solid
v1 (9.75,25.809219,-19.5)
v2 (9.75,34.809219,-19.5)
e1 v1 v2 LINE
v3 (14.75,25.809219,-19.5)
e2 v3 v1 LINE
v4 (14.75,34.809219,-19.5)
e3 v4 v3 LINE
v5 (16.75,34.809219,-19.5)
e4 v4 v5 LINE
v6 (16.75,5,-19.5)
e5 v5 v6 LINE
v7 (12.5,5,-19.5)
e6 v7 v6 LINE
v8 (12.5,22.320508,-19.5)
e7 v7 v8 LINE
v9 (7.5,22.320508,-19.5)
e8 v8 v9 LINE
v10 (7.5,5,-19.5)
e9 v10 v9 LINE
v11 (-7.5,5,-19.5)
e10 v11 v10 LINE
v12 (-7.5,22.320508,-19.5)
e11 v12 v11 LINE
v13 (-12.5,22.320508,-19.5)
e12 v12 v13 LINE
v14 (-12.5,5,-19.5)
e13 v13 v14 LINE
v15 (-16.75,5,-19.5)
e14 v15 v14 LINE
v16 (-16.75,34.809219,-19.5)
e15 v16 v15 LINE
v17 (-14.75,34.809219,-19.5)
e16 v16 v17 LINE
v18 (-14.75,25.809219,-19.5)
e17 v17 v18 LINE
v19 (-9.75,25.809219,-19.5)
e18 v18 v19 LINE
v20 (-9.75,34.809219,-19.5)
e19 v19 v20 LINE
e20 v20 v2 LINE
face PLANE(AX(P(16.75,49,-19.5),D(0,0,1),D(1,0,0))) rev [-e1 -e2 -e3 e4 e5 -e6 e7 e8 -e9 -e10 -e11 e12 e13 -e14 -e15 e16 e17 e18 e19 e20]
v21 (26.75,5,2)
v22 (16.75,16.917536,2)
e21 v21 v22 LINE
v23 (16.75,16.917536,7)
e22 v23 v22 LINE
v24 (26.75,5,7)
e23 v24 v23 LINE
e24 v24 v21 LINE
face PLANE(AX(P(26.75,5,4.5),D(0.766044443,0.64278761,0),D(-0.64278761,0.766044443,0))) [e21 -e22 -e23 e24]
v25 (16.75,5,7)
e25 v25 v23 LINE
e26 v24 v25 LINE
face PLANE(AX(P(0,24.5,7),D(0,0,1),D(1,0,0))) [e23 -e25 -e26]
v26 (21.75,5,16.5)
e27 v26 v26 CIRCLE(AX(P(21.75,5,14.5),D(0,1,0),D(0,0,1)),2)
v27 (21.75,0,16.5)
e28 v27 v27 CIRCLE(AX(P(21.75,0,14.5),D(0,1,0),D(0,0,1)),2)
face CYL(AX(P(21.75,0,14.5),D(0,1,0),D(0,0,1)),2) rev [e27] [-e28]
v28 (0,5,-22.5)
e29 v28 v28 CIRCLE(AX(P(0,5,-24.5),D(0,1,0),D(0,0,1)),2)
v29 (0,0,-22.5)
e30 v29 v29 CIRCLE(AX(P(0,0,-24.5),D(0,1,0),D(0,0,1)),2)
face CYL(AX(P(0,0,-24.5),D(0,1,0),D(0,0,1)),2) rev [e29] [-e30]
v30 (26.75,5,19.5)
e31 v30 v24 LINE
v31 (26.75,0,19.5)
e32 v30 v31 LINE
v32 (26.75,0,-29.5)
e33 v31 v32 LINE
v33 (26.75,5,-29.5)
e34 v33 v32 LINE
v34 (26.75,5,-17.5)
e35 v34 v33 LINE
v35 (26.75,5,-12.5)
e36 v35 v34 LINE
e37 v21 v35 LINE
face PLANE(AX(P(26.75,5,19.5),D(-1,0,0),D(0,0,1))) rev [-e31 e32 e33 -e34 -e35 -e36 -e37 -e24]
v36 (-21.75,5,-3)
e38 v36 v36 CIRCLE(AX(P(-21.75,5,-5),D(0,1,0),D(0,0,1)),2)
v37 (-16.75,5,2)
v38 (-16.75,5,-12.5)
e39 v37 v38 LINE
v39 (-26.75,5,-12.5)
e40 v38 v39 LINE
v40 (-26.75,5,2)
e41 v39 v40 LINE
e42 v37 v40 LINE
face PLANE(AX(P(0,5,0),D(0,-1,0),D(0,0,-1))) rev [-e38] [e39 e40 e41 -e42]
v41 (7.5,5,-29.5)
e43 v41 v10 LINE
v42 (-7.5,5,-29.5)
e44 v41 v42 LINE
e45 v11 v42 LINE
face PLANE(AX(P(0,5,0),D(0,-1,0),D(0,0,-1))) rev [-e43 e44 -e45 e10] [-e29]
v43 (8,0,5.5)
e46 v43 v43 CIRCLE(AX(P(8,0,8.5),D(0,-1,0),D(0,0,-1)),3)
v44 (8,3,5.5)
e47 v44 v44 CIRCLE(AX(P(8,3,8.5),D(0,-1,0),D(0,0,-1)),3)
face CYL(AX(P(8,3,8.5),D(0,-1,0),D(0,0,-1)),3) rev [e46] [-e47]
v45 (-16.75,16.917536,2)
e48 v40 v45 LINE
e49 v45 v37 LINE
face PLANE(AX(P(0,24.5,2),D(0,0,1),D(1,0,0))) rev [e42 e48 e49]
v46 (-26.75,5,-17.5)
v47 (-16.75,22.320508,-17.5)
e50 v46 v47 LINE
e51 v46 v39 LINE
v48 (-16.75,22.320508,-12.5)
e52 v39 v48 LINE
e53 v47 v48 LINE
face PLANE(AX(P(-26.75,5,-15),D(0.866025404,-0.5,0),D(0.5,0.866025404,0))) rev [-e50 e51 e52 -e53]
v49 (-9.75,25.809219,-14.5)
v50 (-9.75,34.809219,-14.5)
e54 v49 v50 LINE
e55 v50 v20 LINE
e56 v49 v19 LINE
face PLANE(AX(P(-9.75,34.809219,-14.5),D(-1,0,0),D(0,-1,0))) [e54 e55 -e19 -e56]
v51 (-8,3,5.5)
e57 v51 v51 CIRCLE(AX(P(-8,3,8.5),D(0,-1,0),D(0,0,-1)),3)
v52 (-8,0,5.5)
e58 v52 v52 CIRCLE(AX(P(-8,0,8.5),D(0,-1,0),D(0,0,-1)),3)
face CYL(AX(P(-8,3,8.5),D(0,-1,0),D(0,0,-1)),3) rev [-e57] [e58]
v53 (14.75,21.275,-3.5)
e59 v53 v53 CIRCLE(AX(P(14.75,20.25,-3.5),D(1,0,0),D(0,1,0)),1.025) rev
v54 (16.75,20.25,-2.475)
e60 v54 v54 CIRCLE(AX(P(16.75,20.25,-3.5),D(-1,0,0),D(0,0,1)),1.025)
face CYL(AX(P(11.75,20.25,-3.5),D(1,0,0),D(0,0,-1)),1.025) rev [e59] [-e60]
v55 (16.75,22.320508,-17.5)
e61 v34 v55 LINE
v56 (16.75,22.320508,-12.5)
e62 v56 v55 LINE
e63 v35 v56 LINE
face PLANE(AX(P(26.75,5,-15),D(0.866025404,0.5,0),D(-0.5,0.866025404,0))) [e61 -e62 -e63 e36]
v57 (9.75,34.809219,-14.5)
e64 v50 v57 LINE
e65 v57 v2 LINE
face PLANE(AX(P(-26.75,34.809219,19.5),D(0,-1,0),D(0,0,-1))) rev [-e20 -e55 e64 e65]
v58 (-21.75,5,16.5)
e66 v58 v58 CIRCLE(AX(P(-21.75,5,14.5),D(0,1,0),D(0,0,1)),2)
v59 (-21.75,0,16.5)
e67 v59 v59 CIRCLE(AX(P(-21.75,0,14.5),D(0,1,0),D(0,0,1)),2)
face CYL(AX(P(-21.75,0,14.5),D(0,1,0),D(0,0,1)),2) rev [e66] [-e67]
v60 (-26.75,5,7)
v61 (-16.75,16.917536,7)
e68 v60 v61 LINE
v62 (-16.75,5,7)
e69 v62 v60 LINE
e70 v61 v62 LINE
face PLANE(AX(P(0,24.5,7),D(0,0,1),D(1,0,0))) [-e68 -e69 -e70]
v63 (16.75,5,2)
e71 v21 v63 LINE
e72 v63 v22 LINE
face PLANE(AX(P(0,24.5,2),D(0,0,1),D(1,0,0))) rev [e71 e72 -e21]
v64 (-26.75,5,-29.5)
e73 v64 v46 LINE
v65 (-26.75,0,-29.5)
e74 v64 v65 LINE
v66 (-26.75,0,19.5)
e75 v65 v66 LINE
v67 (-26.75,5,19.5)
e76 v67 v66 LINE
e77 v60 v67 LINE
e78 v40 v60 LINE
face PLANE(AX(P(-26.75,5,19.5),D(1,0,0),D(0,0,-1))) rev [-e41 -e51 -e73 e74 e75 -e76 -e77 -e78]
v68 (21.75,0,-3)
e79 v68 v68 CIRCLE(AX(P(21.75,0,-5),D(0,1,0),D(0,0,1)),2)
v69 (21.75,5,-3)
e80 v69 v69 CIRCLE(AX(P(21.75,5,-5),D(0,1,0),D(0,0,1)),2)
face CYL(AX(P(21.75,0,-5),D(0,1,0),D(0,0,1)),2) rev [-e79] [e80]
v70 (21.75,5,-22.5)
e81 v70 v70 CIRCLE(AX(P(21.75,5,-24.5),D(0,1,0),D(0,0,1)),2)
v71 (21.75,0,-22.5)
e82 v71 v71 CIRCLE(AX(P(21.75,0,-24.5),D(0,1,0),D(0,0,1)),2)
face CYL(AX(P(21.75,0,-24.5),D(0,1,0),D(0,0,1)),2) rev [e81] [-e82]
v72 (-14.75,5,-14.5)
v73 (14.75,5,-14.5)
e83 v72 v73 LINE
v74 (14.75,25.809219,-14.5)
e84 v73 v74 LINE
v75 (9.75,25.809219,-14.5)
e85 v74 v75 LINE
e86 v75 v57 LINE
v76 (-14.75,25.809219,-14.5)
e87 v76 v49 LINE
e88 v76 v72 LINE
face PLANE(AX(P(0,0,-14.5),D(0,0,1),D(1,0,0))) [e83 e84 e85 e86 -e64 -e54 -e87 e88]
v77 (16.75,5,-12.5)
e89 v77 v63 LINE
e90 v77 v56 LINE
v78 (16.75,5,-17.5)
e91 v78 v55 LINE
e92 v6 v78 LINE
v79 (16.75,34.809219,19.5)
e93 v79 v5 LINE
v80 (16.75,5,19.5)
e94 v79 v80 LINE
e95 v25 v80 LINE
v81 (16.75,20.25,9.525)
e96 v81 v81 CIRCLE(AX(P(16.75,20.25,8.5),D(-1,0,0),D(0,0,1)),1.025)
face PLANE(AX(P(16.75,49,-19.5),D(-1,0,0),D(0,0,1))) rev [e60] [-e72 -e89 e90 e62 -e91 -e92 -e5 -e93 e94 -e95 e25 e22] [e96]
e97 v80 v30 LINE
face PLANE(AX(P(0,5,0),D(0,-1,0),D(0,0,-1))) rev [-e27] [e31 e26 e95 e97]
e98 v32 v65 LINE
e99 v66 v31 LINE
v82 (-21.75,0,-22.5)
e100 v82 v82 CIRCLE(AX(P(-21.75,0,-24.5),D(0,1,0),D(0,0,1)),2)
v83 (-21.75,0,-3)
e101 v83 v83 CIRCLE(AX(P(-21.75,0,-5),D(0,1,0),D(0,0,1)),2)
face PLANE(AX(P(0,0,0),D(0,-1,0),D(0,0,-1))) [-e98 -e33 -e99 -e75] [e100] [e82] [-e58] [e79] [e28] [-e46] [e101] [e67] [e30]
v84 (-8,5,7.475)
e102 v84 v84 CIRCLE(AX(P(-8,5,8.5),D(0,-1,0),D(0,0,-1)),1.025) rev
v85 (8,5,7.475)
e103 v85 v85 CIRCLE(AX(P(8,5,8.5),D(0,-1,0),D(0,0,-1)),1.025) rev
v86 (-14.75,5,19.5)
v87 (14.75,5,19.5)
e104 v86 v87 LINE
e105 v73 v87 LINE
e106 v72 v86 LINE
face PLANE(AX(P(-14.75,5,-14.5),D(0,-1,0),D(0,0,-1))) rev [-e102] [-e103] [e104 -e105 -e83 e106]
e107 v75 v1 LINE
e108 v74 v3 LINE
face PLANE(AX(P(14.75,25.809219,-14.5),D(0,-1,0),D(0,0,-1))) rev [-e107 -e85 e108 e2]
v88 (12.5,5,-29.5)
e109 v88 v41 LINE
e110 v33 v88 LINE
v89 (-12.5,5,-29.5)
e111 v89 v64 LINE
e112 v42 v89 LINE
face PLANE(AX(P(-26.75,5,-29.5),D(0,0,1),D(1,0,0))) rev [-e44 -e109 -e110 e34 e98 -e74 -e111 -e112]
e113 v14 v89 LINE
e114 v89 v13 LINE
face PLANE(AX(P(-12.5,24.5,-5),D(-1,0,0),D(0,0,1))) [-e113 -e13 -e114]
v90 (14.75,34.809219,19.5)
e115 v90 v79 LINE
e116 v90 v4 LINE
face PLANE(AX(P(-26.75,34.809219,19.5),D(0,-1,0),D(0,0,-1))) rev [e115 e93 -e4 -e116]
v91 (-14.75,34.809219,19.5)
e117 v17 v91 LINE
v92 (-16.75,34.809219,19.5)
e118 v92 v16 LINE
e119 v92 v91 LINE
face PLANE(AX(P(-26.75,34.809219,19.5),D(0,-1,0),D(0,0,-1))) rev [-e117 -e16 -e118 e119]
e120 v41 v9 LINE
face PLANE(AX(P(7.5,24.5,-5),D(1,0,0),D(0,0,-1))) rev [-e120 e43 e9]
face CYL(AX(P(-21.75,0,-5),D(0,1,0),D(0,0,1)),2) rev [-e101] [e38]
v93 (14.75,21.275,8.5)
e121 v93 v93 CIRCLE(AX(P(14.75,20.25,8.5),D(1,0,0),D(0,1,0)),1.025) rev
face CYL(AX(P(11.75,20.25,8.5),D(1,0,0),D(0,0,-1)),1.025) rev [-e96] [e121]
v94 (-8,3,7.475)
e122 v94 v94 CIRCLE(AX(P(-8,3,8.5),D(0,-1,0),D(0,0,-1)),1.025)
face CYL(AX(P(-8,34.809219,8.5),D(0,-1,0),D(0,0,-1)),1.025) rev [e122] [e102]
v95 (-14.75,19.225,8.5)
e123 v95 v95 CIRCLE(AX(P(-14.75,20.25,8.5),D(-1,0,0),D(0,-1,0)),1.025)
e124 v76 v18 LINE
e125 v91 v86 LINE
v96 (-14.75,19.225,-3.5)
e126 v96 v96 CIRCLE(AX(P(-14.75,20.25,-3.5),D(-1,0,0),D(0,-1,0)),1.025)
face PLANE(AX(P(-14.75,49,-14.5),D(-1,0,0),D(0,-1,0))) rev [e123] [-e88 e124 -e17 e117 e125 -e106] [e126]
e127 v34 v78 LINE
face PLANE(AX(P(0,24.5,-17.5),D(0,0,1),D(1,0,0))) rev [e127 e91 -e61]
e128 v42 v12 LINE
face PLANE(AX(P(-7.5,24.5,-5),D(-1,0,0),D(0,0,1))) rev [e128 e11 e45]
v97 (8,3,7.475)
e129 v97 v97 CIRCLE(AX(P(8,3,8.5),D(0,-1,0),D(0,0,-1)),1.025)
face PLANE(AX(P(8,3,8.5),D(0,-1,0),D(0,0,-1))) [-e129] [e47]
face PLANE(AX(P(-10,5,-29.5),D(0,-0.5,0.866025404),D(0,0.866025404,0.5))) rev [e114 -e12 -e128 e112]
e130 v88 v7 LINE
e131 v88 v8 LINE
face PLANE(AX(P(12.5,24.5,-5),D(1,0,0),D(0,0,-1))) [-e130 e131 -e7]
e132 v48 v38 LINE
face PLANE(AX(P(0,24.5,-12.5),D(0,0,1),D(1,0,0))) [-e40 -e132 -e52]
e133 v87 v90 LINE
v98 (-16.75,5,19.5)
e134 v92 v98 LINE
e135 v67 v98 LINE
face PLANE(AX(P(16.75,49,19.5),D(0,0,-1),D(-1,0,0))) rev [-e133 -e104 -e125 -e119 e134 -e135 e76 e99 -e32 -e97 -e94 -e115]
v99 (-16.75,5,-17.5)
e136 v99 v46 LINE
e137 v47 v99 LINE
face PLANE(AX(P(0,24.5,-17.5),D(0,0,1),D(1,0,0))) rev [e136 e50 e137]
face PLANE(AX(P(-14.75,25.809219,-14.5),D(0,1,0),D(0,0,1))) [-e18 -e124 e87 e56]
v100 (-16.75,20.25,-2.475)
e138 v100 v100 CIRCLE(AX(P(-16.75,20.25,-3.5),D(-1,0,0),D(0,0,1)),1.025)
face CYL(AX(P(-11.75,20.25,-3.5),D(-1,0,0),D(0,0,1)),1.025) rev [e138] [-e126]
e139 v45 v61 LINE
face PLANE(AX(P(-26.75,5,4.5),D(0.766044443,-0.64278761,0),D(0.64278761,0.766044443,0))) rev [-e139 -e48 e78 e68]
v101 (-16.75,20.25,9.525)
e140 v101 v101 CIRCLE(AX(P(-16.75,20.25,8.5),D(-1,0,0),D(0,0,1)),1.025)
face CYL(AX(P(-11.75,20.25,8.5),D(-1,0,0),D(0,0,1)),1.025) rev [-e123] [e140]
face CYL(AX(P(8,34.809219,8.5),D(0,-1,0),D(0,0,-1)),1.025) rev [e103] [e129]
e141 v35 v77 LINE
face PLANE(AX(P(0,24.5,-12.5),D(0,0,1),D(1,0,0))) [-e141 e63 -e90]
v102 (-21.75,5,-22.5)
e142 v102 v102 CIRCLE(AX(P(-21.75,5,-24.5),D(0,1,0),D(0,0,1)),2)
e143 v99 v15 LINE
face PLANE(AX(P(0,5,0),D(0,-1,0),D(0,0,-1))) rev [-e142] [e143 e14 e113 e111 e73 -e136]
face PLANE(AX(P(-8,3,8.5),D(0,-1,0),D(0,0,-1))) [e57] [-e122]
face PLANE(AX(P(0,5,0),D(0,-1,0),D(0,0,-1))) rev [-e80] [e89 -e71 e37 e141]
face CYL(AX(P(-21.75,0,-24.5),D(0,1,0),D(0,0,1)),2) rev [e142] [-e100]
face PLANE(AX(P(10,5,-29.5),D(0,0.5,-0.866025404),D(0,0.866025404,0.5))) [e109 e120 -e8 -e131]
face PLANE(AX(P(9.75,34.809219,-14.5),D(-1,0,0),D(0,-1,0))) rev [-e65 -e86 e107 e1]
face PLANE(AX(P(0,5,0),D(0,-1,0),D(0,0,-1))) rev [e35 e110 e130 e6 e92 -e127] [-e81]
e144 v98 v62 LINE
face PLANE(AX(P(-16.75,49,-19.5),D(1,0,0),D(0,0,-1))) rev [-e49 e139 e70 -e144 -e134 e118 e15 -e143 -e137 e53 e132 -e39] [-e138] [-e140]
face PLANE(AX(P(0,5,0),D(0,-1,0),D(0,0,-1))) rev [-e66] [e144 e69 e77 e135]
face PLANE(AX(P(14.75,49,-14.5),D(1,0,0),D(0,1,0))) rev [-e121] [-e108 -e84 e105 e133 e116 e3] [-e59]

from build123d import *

# Parameters (mm, degrees)
ESQUISSE1_W             = 33.5
ESQUISSE1_H             = 39
BOSS_EXTRU_1_DEPTH      = 49
ESQUISSE3_W             = 29.5
ESQUISSE3_H             = 44
ENL_V_MAT_EXTRU_1_DEPTH = 34
ESQUISSE4_W             = 53.5
ESQUISSE4_H             = 49
BOSS_EXTRU_2_DEPTH      = 5
ESQUISSE5_R             = 2
ENL_V_MAT_EXTRU_2_DEPTH = 5
NERVURE3_REACH          = 67.365
ESQUISSE8_WALL_W        = 148.286921202
ESQUISSE8_WALL_H        = 5
NERVURE4_REACH          = 67.626
ESQUISSE9_WALL_W        = 153.252619022
ESQUISSE9_WALL_H        = 5
NERVURE5_REACH          = 69.984
ESQUISSE10_WALL_W       = 157.967827076
ESQUISSE10_WALL_H       = 5
ESQUISSE11_R            = 1.025
ENL_V_MAT_EXTRU_3_DEPTH = 5
ESQUISSE13_W            = 39
ESQUISSE13_H            = 14.190780958
ENL_V_MAT_EXTRU_5_DEPTH = 72.857497869
SYM_TRIE6_START         = 25.809219042
SYM_TRIE6_OUTLINE_W     = 5
SYM_TRIE6_OUTLINE_H     = 5
SYM_TRIE6_DEPTH         = 9
SYM_TRIE6_2_OUTLINE_R   = 3
SYM_TRIE6_2_DEPTH       = 3
SYM_TRIE6_START_2       = 3
SYM_TRIE6_3_OUTLINE_R   = 1.025
SYM_TRIE6_3_DEPTH       = 2


# Read off the part's stored shape, not the designer's step: Symétrie6
with BuildPart() as part:
    # Esquisse1 → Boss.-Extru.1 (new body)
    with BuildSketch(Plane(origin=(0, 0, 0), x_dir=(1, 0, 0), z_dir=(0, 1, 0))):
        Rectangle(ESQUISSE1_W, ESQUISSE1_H)
    extrude(amount=BOSS_EXTRU_1_DEPTH)

    # Esquisse3 → Enlèv. mat.-Extru.1 (cut)
    with BuildSketch(Plane.XY.offset(19.5)):
        with Locations((0, 27)):
            Rectangle(ESQUISSE3_W, ESQUISSE3_H)
    extrude(amount=-ENL_V_MAT_EXTRU_1_DEPTH, mode=Mode.SUBTRACT)

    # Esquisse4 → Boss.-Extru.2 (add)
    with BuildSketch(Plane(origin=(0, 0, 0), x_dir=(1, 0, 0), z_dir=(0, 1, 0))):
        with Locations((0, 5)):
            Rectangle(ESQUISSE4_W, ESQUISSE4_H)
    extrude(amount=BOSS_EXTRU_2_DEPTH)

    # Esquisse5 → Enlèv. mat.-Extru.2 (cut)
    with BuildSketch(Plane(origin=(0, 5, 0), x_dir=(1, 0, 0), z_dir=(0, 1, 0))):
        with Locations(Location((-21.75, 24.5, 0), (0, 0, 270))):
            Circle(ESQUISSE5_R)
        with Locations(Location((0, 24.5, 0), (0, 0, 270))):
            Circle(ESQUISSE5_R)
        with Locations(Location((21.75, 24.5, 0), (0, 0, 270))):
            Circle(ESQUISSE5_R)
        with Locations(Location((21.75, 5, 0), (0, 0, 270))):
            Circle(ESQUISSE5_R)
        with Locations(Location((21.75, -14.5, 0), (0, 0, 270))):
            Circle(ESQUISSE5_R)
        with Locations(Location((-21.75, -14.5, 0), (0, 0, 270))):
            Circle(ESQUISSE5_R)
        with Locations(Location((-21.75, 5, 0), (0, 0, 270))):
            Circle(ESQUISSE5_R)
    extrude(amount=-ENL_V_MAT_EXTRU_2_DEPTH, mode=Mode.SUBTRACT)

    # Esquisse8 wall → Nervure3 (add, up to next)
    with BuildSketch(Plane(origin=(21.75, 10.958767963, 4.5), x_dir=(-0.642787609685, 0.766044443121, 0), z_dir=(-0.766044443121, -0.642787609685, 0)), mode=Mode.PRIVATE) as nervure3_sk1:
        Rectangle(ESQUISSE8_WALL_W, ESQUISSE8_WALL_H)
    nervure3_tool1 = extrude(nervure3_sk1.sketch, amount=NERVURE3_REACH, mode=Mode.PRIVATE) - part.part
    nervure3 = nervure3_tool1.solids().sort_by_distance((21.75, 10.958767963, 4.5))[0]
    add(nervure3)

    # Esquisse9 wall → Nervure4 (add, up to next)
    with BuildSketch(Plane(origin=(21.75, 13.660254038, -15), x_dir=(-0.499999999993, 0.866025403788, 0), z_dir=(-0.866025403788, -0.499999999993, 0)), mode=Mode.PRIVATE) as nervure4_sk1:
        Rectangle(ESQUISSE9_WALL_W, ESQUISSE9_WALL_H)
    nervure4_tool1 = extrude(nervure4_sk1.sketch, amount=NERVURE4_REACH, mode=Mode.PRIVATE) - part.part
    nervure4 = nervure4_tool1.solids().sort_by_distance((21.75, 13.660254038, -15))[0]
    add(nervure4)

    # Esquisse10 wall → Nervure5 (add, up to next)
    with BuildSketch(Plane(origin=(10, 13.660254038, -24.5), x_dir=(0, 0.866025403788, 0.499999999993), z_dir=(0, -0.499999999993, 0.866025403788)), mode=Mode.PRIVATE) as nervure5_sk1:
        Rectangle(ESQUISSE10_WALL_W, ESQUISSE10_WALL_H)
    nervure5_tool1 = extrude(nervure5_sk1.sketch, amount=NERVURE5_REACH, mode=Mode.PRIVATE) - part.part
    nervure5 = nervure5_tool1.solids().sort_by_distance((10, 13.660254038, -24.5))[0]
    add(nervure5)

    # Symétrie1: Nervure5 across plane
    add(nervure5.mirror(Plane(origin=(0, 0, 0), x_dir=(0, 0, 1), z_dir=(1, 0, 0))))

    # Symétrie3: Nervure3, Nervure4 across plane
    add(nervure3.mirror(Plane(origin=(0, 0, 0), x_dir=(0, 0, 1), z_dir=(1, 0, 0))))
    add(nervure4.mirror(Plane(origin=(0, 0, 0), x_dir=(0, 0, 1), z_dir=(1, 0, 0))))

    # Esquisse11 → Enlèv. mat.-Extru.3 (cut)
    with BuildSketch(Plane.ZY.offset(16.75)):
        with Locations((-3.5, 44.25)):
            Circle(ESQUISSE11_R)
        with Locations((8.5, 44.25)):
            Circle(ESQUISSE11_R)
        with Locations((-3.5, 20.25)):
            Circle(ESQUISSE11_R)
        with Locations((8.5, 20.25)):
            Circle(ESQUISSE11_R)
    enl_v_mat_extru_3 = extrude(amount=-ENL_V_MAT_EXTRU_3_DEPTH, mode=Mode.SUBTRACT)

    # Symétrie4: Enlèv. mat.-Extru.3 across plane
    add(enl_v_mat_extru_3.mirror(Plane(origin=(0, 0, 0), x_dir=(0, 0, 1), z_dir=(1, 0, 0))), mode=Mode.SUBTRACT)

    # Esquisse13 → Enlèv. mat.-Extru.5 (cut, through all)
    with BuildSketch(Plane(origin=(16.75, 0, 0), x_dir=(0, 0, -1), z_dir=(1, 0, 0))):
        with Locations((0, 41.904609521)):
            Rectangle(ESQUISSE13_W, ESQUISSE13_H)
    extrude(amount=-ENL_V_MAT_EXTRU_5_DEPTH, mode=Mode.SUBTRACT)

    # Symétrie6 outline → Symétrie6 (cut)
    with BuildSketch(Plane(origin=(0, 0, 0), x_dir=(1, 0, 0), z_dir=(0, 1, 0)).offset(SYM_TRIE6_START)):
        with Locations((-12.25, 17)):
            Rectangle(SYM_TRIE6_OUTLINE_W, SYM_TRIE6_OUTLINE_H)
        with Locations((12.25, 17)):
            Rectangle(SYM_TRIE6_OUTLINE_W, SYM_TRIE6_OUTLINE_H)
    extrude(amount=SYM_TRIE6_DEPTH, mode=Mode.SUBTRACT)

    # Sym_trie6 2 outline → Sym_trie6 2 (cut)
    with BuildSketch(Plane(origin=(0, 0, 0), x_dir=(1, 0, 0), z_dir=(0, 1, 0))):
        with Locations((8, -8.5)):
            Circle(SYM_TRIE6_2_OUTLINE_R)
        with Locations((-8, -8.5)):
            Circle(SYM_TRIE6_2_OUTLINE_R)
    extrude(amount=SYM_TRIE6_2_DEPTH, mode=Mode.SUBTRACT)

    # Sym_trie6 3 outline → Sym_trie6 3 (cut)
    with BuildSketch(Plane(origin=(0, 0, 0), x_dir=(1, 0, 0), z_dir=(0, 1, 0)).offset(SYM_TRIE6_START_2)):
        with Locations((8, -8.5)):
            Circle(SYM_TRIE6_3_OUTLINE_R)
        with Locations((-8, -8.5)):
            Circle(SYM_TRIE6_3_OUTLINE_R)
    extrude(amount=SYM_TRIE6_3_DEPTH, mode=Mode.SUBTRACT)


solid = part.part
